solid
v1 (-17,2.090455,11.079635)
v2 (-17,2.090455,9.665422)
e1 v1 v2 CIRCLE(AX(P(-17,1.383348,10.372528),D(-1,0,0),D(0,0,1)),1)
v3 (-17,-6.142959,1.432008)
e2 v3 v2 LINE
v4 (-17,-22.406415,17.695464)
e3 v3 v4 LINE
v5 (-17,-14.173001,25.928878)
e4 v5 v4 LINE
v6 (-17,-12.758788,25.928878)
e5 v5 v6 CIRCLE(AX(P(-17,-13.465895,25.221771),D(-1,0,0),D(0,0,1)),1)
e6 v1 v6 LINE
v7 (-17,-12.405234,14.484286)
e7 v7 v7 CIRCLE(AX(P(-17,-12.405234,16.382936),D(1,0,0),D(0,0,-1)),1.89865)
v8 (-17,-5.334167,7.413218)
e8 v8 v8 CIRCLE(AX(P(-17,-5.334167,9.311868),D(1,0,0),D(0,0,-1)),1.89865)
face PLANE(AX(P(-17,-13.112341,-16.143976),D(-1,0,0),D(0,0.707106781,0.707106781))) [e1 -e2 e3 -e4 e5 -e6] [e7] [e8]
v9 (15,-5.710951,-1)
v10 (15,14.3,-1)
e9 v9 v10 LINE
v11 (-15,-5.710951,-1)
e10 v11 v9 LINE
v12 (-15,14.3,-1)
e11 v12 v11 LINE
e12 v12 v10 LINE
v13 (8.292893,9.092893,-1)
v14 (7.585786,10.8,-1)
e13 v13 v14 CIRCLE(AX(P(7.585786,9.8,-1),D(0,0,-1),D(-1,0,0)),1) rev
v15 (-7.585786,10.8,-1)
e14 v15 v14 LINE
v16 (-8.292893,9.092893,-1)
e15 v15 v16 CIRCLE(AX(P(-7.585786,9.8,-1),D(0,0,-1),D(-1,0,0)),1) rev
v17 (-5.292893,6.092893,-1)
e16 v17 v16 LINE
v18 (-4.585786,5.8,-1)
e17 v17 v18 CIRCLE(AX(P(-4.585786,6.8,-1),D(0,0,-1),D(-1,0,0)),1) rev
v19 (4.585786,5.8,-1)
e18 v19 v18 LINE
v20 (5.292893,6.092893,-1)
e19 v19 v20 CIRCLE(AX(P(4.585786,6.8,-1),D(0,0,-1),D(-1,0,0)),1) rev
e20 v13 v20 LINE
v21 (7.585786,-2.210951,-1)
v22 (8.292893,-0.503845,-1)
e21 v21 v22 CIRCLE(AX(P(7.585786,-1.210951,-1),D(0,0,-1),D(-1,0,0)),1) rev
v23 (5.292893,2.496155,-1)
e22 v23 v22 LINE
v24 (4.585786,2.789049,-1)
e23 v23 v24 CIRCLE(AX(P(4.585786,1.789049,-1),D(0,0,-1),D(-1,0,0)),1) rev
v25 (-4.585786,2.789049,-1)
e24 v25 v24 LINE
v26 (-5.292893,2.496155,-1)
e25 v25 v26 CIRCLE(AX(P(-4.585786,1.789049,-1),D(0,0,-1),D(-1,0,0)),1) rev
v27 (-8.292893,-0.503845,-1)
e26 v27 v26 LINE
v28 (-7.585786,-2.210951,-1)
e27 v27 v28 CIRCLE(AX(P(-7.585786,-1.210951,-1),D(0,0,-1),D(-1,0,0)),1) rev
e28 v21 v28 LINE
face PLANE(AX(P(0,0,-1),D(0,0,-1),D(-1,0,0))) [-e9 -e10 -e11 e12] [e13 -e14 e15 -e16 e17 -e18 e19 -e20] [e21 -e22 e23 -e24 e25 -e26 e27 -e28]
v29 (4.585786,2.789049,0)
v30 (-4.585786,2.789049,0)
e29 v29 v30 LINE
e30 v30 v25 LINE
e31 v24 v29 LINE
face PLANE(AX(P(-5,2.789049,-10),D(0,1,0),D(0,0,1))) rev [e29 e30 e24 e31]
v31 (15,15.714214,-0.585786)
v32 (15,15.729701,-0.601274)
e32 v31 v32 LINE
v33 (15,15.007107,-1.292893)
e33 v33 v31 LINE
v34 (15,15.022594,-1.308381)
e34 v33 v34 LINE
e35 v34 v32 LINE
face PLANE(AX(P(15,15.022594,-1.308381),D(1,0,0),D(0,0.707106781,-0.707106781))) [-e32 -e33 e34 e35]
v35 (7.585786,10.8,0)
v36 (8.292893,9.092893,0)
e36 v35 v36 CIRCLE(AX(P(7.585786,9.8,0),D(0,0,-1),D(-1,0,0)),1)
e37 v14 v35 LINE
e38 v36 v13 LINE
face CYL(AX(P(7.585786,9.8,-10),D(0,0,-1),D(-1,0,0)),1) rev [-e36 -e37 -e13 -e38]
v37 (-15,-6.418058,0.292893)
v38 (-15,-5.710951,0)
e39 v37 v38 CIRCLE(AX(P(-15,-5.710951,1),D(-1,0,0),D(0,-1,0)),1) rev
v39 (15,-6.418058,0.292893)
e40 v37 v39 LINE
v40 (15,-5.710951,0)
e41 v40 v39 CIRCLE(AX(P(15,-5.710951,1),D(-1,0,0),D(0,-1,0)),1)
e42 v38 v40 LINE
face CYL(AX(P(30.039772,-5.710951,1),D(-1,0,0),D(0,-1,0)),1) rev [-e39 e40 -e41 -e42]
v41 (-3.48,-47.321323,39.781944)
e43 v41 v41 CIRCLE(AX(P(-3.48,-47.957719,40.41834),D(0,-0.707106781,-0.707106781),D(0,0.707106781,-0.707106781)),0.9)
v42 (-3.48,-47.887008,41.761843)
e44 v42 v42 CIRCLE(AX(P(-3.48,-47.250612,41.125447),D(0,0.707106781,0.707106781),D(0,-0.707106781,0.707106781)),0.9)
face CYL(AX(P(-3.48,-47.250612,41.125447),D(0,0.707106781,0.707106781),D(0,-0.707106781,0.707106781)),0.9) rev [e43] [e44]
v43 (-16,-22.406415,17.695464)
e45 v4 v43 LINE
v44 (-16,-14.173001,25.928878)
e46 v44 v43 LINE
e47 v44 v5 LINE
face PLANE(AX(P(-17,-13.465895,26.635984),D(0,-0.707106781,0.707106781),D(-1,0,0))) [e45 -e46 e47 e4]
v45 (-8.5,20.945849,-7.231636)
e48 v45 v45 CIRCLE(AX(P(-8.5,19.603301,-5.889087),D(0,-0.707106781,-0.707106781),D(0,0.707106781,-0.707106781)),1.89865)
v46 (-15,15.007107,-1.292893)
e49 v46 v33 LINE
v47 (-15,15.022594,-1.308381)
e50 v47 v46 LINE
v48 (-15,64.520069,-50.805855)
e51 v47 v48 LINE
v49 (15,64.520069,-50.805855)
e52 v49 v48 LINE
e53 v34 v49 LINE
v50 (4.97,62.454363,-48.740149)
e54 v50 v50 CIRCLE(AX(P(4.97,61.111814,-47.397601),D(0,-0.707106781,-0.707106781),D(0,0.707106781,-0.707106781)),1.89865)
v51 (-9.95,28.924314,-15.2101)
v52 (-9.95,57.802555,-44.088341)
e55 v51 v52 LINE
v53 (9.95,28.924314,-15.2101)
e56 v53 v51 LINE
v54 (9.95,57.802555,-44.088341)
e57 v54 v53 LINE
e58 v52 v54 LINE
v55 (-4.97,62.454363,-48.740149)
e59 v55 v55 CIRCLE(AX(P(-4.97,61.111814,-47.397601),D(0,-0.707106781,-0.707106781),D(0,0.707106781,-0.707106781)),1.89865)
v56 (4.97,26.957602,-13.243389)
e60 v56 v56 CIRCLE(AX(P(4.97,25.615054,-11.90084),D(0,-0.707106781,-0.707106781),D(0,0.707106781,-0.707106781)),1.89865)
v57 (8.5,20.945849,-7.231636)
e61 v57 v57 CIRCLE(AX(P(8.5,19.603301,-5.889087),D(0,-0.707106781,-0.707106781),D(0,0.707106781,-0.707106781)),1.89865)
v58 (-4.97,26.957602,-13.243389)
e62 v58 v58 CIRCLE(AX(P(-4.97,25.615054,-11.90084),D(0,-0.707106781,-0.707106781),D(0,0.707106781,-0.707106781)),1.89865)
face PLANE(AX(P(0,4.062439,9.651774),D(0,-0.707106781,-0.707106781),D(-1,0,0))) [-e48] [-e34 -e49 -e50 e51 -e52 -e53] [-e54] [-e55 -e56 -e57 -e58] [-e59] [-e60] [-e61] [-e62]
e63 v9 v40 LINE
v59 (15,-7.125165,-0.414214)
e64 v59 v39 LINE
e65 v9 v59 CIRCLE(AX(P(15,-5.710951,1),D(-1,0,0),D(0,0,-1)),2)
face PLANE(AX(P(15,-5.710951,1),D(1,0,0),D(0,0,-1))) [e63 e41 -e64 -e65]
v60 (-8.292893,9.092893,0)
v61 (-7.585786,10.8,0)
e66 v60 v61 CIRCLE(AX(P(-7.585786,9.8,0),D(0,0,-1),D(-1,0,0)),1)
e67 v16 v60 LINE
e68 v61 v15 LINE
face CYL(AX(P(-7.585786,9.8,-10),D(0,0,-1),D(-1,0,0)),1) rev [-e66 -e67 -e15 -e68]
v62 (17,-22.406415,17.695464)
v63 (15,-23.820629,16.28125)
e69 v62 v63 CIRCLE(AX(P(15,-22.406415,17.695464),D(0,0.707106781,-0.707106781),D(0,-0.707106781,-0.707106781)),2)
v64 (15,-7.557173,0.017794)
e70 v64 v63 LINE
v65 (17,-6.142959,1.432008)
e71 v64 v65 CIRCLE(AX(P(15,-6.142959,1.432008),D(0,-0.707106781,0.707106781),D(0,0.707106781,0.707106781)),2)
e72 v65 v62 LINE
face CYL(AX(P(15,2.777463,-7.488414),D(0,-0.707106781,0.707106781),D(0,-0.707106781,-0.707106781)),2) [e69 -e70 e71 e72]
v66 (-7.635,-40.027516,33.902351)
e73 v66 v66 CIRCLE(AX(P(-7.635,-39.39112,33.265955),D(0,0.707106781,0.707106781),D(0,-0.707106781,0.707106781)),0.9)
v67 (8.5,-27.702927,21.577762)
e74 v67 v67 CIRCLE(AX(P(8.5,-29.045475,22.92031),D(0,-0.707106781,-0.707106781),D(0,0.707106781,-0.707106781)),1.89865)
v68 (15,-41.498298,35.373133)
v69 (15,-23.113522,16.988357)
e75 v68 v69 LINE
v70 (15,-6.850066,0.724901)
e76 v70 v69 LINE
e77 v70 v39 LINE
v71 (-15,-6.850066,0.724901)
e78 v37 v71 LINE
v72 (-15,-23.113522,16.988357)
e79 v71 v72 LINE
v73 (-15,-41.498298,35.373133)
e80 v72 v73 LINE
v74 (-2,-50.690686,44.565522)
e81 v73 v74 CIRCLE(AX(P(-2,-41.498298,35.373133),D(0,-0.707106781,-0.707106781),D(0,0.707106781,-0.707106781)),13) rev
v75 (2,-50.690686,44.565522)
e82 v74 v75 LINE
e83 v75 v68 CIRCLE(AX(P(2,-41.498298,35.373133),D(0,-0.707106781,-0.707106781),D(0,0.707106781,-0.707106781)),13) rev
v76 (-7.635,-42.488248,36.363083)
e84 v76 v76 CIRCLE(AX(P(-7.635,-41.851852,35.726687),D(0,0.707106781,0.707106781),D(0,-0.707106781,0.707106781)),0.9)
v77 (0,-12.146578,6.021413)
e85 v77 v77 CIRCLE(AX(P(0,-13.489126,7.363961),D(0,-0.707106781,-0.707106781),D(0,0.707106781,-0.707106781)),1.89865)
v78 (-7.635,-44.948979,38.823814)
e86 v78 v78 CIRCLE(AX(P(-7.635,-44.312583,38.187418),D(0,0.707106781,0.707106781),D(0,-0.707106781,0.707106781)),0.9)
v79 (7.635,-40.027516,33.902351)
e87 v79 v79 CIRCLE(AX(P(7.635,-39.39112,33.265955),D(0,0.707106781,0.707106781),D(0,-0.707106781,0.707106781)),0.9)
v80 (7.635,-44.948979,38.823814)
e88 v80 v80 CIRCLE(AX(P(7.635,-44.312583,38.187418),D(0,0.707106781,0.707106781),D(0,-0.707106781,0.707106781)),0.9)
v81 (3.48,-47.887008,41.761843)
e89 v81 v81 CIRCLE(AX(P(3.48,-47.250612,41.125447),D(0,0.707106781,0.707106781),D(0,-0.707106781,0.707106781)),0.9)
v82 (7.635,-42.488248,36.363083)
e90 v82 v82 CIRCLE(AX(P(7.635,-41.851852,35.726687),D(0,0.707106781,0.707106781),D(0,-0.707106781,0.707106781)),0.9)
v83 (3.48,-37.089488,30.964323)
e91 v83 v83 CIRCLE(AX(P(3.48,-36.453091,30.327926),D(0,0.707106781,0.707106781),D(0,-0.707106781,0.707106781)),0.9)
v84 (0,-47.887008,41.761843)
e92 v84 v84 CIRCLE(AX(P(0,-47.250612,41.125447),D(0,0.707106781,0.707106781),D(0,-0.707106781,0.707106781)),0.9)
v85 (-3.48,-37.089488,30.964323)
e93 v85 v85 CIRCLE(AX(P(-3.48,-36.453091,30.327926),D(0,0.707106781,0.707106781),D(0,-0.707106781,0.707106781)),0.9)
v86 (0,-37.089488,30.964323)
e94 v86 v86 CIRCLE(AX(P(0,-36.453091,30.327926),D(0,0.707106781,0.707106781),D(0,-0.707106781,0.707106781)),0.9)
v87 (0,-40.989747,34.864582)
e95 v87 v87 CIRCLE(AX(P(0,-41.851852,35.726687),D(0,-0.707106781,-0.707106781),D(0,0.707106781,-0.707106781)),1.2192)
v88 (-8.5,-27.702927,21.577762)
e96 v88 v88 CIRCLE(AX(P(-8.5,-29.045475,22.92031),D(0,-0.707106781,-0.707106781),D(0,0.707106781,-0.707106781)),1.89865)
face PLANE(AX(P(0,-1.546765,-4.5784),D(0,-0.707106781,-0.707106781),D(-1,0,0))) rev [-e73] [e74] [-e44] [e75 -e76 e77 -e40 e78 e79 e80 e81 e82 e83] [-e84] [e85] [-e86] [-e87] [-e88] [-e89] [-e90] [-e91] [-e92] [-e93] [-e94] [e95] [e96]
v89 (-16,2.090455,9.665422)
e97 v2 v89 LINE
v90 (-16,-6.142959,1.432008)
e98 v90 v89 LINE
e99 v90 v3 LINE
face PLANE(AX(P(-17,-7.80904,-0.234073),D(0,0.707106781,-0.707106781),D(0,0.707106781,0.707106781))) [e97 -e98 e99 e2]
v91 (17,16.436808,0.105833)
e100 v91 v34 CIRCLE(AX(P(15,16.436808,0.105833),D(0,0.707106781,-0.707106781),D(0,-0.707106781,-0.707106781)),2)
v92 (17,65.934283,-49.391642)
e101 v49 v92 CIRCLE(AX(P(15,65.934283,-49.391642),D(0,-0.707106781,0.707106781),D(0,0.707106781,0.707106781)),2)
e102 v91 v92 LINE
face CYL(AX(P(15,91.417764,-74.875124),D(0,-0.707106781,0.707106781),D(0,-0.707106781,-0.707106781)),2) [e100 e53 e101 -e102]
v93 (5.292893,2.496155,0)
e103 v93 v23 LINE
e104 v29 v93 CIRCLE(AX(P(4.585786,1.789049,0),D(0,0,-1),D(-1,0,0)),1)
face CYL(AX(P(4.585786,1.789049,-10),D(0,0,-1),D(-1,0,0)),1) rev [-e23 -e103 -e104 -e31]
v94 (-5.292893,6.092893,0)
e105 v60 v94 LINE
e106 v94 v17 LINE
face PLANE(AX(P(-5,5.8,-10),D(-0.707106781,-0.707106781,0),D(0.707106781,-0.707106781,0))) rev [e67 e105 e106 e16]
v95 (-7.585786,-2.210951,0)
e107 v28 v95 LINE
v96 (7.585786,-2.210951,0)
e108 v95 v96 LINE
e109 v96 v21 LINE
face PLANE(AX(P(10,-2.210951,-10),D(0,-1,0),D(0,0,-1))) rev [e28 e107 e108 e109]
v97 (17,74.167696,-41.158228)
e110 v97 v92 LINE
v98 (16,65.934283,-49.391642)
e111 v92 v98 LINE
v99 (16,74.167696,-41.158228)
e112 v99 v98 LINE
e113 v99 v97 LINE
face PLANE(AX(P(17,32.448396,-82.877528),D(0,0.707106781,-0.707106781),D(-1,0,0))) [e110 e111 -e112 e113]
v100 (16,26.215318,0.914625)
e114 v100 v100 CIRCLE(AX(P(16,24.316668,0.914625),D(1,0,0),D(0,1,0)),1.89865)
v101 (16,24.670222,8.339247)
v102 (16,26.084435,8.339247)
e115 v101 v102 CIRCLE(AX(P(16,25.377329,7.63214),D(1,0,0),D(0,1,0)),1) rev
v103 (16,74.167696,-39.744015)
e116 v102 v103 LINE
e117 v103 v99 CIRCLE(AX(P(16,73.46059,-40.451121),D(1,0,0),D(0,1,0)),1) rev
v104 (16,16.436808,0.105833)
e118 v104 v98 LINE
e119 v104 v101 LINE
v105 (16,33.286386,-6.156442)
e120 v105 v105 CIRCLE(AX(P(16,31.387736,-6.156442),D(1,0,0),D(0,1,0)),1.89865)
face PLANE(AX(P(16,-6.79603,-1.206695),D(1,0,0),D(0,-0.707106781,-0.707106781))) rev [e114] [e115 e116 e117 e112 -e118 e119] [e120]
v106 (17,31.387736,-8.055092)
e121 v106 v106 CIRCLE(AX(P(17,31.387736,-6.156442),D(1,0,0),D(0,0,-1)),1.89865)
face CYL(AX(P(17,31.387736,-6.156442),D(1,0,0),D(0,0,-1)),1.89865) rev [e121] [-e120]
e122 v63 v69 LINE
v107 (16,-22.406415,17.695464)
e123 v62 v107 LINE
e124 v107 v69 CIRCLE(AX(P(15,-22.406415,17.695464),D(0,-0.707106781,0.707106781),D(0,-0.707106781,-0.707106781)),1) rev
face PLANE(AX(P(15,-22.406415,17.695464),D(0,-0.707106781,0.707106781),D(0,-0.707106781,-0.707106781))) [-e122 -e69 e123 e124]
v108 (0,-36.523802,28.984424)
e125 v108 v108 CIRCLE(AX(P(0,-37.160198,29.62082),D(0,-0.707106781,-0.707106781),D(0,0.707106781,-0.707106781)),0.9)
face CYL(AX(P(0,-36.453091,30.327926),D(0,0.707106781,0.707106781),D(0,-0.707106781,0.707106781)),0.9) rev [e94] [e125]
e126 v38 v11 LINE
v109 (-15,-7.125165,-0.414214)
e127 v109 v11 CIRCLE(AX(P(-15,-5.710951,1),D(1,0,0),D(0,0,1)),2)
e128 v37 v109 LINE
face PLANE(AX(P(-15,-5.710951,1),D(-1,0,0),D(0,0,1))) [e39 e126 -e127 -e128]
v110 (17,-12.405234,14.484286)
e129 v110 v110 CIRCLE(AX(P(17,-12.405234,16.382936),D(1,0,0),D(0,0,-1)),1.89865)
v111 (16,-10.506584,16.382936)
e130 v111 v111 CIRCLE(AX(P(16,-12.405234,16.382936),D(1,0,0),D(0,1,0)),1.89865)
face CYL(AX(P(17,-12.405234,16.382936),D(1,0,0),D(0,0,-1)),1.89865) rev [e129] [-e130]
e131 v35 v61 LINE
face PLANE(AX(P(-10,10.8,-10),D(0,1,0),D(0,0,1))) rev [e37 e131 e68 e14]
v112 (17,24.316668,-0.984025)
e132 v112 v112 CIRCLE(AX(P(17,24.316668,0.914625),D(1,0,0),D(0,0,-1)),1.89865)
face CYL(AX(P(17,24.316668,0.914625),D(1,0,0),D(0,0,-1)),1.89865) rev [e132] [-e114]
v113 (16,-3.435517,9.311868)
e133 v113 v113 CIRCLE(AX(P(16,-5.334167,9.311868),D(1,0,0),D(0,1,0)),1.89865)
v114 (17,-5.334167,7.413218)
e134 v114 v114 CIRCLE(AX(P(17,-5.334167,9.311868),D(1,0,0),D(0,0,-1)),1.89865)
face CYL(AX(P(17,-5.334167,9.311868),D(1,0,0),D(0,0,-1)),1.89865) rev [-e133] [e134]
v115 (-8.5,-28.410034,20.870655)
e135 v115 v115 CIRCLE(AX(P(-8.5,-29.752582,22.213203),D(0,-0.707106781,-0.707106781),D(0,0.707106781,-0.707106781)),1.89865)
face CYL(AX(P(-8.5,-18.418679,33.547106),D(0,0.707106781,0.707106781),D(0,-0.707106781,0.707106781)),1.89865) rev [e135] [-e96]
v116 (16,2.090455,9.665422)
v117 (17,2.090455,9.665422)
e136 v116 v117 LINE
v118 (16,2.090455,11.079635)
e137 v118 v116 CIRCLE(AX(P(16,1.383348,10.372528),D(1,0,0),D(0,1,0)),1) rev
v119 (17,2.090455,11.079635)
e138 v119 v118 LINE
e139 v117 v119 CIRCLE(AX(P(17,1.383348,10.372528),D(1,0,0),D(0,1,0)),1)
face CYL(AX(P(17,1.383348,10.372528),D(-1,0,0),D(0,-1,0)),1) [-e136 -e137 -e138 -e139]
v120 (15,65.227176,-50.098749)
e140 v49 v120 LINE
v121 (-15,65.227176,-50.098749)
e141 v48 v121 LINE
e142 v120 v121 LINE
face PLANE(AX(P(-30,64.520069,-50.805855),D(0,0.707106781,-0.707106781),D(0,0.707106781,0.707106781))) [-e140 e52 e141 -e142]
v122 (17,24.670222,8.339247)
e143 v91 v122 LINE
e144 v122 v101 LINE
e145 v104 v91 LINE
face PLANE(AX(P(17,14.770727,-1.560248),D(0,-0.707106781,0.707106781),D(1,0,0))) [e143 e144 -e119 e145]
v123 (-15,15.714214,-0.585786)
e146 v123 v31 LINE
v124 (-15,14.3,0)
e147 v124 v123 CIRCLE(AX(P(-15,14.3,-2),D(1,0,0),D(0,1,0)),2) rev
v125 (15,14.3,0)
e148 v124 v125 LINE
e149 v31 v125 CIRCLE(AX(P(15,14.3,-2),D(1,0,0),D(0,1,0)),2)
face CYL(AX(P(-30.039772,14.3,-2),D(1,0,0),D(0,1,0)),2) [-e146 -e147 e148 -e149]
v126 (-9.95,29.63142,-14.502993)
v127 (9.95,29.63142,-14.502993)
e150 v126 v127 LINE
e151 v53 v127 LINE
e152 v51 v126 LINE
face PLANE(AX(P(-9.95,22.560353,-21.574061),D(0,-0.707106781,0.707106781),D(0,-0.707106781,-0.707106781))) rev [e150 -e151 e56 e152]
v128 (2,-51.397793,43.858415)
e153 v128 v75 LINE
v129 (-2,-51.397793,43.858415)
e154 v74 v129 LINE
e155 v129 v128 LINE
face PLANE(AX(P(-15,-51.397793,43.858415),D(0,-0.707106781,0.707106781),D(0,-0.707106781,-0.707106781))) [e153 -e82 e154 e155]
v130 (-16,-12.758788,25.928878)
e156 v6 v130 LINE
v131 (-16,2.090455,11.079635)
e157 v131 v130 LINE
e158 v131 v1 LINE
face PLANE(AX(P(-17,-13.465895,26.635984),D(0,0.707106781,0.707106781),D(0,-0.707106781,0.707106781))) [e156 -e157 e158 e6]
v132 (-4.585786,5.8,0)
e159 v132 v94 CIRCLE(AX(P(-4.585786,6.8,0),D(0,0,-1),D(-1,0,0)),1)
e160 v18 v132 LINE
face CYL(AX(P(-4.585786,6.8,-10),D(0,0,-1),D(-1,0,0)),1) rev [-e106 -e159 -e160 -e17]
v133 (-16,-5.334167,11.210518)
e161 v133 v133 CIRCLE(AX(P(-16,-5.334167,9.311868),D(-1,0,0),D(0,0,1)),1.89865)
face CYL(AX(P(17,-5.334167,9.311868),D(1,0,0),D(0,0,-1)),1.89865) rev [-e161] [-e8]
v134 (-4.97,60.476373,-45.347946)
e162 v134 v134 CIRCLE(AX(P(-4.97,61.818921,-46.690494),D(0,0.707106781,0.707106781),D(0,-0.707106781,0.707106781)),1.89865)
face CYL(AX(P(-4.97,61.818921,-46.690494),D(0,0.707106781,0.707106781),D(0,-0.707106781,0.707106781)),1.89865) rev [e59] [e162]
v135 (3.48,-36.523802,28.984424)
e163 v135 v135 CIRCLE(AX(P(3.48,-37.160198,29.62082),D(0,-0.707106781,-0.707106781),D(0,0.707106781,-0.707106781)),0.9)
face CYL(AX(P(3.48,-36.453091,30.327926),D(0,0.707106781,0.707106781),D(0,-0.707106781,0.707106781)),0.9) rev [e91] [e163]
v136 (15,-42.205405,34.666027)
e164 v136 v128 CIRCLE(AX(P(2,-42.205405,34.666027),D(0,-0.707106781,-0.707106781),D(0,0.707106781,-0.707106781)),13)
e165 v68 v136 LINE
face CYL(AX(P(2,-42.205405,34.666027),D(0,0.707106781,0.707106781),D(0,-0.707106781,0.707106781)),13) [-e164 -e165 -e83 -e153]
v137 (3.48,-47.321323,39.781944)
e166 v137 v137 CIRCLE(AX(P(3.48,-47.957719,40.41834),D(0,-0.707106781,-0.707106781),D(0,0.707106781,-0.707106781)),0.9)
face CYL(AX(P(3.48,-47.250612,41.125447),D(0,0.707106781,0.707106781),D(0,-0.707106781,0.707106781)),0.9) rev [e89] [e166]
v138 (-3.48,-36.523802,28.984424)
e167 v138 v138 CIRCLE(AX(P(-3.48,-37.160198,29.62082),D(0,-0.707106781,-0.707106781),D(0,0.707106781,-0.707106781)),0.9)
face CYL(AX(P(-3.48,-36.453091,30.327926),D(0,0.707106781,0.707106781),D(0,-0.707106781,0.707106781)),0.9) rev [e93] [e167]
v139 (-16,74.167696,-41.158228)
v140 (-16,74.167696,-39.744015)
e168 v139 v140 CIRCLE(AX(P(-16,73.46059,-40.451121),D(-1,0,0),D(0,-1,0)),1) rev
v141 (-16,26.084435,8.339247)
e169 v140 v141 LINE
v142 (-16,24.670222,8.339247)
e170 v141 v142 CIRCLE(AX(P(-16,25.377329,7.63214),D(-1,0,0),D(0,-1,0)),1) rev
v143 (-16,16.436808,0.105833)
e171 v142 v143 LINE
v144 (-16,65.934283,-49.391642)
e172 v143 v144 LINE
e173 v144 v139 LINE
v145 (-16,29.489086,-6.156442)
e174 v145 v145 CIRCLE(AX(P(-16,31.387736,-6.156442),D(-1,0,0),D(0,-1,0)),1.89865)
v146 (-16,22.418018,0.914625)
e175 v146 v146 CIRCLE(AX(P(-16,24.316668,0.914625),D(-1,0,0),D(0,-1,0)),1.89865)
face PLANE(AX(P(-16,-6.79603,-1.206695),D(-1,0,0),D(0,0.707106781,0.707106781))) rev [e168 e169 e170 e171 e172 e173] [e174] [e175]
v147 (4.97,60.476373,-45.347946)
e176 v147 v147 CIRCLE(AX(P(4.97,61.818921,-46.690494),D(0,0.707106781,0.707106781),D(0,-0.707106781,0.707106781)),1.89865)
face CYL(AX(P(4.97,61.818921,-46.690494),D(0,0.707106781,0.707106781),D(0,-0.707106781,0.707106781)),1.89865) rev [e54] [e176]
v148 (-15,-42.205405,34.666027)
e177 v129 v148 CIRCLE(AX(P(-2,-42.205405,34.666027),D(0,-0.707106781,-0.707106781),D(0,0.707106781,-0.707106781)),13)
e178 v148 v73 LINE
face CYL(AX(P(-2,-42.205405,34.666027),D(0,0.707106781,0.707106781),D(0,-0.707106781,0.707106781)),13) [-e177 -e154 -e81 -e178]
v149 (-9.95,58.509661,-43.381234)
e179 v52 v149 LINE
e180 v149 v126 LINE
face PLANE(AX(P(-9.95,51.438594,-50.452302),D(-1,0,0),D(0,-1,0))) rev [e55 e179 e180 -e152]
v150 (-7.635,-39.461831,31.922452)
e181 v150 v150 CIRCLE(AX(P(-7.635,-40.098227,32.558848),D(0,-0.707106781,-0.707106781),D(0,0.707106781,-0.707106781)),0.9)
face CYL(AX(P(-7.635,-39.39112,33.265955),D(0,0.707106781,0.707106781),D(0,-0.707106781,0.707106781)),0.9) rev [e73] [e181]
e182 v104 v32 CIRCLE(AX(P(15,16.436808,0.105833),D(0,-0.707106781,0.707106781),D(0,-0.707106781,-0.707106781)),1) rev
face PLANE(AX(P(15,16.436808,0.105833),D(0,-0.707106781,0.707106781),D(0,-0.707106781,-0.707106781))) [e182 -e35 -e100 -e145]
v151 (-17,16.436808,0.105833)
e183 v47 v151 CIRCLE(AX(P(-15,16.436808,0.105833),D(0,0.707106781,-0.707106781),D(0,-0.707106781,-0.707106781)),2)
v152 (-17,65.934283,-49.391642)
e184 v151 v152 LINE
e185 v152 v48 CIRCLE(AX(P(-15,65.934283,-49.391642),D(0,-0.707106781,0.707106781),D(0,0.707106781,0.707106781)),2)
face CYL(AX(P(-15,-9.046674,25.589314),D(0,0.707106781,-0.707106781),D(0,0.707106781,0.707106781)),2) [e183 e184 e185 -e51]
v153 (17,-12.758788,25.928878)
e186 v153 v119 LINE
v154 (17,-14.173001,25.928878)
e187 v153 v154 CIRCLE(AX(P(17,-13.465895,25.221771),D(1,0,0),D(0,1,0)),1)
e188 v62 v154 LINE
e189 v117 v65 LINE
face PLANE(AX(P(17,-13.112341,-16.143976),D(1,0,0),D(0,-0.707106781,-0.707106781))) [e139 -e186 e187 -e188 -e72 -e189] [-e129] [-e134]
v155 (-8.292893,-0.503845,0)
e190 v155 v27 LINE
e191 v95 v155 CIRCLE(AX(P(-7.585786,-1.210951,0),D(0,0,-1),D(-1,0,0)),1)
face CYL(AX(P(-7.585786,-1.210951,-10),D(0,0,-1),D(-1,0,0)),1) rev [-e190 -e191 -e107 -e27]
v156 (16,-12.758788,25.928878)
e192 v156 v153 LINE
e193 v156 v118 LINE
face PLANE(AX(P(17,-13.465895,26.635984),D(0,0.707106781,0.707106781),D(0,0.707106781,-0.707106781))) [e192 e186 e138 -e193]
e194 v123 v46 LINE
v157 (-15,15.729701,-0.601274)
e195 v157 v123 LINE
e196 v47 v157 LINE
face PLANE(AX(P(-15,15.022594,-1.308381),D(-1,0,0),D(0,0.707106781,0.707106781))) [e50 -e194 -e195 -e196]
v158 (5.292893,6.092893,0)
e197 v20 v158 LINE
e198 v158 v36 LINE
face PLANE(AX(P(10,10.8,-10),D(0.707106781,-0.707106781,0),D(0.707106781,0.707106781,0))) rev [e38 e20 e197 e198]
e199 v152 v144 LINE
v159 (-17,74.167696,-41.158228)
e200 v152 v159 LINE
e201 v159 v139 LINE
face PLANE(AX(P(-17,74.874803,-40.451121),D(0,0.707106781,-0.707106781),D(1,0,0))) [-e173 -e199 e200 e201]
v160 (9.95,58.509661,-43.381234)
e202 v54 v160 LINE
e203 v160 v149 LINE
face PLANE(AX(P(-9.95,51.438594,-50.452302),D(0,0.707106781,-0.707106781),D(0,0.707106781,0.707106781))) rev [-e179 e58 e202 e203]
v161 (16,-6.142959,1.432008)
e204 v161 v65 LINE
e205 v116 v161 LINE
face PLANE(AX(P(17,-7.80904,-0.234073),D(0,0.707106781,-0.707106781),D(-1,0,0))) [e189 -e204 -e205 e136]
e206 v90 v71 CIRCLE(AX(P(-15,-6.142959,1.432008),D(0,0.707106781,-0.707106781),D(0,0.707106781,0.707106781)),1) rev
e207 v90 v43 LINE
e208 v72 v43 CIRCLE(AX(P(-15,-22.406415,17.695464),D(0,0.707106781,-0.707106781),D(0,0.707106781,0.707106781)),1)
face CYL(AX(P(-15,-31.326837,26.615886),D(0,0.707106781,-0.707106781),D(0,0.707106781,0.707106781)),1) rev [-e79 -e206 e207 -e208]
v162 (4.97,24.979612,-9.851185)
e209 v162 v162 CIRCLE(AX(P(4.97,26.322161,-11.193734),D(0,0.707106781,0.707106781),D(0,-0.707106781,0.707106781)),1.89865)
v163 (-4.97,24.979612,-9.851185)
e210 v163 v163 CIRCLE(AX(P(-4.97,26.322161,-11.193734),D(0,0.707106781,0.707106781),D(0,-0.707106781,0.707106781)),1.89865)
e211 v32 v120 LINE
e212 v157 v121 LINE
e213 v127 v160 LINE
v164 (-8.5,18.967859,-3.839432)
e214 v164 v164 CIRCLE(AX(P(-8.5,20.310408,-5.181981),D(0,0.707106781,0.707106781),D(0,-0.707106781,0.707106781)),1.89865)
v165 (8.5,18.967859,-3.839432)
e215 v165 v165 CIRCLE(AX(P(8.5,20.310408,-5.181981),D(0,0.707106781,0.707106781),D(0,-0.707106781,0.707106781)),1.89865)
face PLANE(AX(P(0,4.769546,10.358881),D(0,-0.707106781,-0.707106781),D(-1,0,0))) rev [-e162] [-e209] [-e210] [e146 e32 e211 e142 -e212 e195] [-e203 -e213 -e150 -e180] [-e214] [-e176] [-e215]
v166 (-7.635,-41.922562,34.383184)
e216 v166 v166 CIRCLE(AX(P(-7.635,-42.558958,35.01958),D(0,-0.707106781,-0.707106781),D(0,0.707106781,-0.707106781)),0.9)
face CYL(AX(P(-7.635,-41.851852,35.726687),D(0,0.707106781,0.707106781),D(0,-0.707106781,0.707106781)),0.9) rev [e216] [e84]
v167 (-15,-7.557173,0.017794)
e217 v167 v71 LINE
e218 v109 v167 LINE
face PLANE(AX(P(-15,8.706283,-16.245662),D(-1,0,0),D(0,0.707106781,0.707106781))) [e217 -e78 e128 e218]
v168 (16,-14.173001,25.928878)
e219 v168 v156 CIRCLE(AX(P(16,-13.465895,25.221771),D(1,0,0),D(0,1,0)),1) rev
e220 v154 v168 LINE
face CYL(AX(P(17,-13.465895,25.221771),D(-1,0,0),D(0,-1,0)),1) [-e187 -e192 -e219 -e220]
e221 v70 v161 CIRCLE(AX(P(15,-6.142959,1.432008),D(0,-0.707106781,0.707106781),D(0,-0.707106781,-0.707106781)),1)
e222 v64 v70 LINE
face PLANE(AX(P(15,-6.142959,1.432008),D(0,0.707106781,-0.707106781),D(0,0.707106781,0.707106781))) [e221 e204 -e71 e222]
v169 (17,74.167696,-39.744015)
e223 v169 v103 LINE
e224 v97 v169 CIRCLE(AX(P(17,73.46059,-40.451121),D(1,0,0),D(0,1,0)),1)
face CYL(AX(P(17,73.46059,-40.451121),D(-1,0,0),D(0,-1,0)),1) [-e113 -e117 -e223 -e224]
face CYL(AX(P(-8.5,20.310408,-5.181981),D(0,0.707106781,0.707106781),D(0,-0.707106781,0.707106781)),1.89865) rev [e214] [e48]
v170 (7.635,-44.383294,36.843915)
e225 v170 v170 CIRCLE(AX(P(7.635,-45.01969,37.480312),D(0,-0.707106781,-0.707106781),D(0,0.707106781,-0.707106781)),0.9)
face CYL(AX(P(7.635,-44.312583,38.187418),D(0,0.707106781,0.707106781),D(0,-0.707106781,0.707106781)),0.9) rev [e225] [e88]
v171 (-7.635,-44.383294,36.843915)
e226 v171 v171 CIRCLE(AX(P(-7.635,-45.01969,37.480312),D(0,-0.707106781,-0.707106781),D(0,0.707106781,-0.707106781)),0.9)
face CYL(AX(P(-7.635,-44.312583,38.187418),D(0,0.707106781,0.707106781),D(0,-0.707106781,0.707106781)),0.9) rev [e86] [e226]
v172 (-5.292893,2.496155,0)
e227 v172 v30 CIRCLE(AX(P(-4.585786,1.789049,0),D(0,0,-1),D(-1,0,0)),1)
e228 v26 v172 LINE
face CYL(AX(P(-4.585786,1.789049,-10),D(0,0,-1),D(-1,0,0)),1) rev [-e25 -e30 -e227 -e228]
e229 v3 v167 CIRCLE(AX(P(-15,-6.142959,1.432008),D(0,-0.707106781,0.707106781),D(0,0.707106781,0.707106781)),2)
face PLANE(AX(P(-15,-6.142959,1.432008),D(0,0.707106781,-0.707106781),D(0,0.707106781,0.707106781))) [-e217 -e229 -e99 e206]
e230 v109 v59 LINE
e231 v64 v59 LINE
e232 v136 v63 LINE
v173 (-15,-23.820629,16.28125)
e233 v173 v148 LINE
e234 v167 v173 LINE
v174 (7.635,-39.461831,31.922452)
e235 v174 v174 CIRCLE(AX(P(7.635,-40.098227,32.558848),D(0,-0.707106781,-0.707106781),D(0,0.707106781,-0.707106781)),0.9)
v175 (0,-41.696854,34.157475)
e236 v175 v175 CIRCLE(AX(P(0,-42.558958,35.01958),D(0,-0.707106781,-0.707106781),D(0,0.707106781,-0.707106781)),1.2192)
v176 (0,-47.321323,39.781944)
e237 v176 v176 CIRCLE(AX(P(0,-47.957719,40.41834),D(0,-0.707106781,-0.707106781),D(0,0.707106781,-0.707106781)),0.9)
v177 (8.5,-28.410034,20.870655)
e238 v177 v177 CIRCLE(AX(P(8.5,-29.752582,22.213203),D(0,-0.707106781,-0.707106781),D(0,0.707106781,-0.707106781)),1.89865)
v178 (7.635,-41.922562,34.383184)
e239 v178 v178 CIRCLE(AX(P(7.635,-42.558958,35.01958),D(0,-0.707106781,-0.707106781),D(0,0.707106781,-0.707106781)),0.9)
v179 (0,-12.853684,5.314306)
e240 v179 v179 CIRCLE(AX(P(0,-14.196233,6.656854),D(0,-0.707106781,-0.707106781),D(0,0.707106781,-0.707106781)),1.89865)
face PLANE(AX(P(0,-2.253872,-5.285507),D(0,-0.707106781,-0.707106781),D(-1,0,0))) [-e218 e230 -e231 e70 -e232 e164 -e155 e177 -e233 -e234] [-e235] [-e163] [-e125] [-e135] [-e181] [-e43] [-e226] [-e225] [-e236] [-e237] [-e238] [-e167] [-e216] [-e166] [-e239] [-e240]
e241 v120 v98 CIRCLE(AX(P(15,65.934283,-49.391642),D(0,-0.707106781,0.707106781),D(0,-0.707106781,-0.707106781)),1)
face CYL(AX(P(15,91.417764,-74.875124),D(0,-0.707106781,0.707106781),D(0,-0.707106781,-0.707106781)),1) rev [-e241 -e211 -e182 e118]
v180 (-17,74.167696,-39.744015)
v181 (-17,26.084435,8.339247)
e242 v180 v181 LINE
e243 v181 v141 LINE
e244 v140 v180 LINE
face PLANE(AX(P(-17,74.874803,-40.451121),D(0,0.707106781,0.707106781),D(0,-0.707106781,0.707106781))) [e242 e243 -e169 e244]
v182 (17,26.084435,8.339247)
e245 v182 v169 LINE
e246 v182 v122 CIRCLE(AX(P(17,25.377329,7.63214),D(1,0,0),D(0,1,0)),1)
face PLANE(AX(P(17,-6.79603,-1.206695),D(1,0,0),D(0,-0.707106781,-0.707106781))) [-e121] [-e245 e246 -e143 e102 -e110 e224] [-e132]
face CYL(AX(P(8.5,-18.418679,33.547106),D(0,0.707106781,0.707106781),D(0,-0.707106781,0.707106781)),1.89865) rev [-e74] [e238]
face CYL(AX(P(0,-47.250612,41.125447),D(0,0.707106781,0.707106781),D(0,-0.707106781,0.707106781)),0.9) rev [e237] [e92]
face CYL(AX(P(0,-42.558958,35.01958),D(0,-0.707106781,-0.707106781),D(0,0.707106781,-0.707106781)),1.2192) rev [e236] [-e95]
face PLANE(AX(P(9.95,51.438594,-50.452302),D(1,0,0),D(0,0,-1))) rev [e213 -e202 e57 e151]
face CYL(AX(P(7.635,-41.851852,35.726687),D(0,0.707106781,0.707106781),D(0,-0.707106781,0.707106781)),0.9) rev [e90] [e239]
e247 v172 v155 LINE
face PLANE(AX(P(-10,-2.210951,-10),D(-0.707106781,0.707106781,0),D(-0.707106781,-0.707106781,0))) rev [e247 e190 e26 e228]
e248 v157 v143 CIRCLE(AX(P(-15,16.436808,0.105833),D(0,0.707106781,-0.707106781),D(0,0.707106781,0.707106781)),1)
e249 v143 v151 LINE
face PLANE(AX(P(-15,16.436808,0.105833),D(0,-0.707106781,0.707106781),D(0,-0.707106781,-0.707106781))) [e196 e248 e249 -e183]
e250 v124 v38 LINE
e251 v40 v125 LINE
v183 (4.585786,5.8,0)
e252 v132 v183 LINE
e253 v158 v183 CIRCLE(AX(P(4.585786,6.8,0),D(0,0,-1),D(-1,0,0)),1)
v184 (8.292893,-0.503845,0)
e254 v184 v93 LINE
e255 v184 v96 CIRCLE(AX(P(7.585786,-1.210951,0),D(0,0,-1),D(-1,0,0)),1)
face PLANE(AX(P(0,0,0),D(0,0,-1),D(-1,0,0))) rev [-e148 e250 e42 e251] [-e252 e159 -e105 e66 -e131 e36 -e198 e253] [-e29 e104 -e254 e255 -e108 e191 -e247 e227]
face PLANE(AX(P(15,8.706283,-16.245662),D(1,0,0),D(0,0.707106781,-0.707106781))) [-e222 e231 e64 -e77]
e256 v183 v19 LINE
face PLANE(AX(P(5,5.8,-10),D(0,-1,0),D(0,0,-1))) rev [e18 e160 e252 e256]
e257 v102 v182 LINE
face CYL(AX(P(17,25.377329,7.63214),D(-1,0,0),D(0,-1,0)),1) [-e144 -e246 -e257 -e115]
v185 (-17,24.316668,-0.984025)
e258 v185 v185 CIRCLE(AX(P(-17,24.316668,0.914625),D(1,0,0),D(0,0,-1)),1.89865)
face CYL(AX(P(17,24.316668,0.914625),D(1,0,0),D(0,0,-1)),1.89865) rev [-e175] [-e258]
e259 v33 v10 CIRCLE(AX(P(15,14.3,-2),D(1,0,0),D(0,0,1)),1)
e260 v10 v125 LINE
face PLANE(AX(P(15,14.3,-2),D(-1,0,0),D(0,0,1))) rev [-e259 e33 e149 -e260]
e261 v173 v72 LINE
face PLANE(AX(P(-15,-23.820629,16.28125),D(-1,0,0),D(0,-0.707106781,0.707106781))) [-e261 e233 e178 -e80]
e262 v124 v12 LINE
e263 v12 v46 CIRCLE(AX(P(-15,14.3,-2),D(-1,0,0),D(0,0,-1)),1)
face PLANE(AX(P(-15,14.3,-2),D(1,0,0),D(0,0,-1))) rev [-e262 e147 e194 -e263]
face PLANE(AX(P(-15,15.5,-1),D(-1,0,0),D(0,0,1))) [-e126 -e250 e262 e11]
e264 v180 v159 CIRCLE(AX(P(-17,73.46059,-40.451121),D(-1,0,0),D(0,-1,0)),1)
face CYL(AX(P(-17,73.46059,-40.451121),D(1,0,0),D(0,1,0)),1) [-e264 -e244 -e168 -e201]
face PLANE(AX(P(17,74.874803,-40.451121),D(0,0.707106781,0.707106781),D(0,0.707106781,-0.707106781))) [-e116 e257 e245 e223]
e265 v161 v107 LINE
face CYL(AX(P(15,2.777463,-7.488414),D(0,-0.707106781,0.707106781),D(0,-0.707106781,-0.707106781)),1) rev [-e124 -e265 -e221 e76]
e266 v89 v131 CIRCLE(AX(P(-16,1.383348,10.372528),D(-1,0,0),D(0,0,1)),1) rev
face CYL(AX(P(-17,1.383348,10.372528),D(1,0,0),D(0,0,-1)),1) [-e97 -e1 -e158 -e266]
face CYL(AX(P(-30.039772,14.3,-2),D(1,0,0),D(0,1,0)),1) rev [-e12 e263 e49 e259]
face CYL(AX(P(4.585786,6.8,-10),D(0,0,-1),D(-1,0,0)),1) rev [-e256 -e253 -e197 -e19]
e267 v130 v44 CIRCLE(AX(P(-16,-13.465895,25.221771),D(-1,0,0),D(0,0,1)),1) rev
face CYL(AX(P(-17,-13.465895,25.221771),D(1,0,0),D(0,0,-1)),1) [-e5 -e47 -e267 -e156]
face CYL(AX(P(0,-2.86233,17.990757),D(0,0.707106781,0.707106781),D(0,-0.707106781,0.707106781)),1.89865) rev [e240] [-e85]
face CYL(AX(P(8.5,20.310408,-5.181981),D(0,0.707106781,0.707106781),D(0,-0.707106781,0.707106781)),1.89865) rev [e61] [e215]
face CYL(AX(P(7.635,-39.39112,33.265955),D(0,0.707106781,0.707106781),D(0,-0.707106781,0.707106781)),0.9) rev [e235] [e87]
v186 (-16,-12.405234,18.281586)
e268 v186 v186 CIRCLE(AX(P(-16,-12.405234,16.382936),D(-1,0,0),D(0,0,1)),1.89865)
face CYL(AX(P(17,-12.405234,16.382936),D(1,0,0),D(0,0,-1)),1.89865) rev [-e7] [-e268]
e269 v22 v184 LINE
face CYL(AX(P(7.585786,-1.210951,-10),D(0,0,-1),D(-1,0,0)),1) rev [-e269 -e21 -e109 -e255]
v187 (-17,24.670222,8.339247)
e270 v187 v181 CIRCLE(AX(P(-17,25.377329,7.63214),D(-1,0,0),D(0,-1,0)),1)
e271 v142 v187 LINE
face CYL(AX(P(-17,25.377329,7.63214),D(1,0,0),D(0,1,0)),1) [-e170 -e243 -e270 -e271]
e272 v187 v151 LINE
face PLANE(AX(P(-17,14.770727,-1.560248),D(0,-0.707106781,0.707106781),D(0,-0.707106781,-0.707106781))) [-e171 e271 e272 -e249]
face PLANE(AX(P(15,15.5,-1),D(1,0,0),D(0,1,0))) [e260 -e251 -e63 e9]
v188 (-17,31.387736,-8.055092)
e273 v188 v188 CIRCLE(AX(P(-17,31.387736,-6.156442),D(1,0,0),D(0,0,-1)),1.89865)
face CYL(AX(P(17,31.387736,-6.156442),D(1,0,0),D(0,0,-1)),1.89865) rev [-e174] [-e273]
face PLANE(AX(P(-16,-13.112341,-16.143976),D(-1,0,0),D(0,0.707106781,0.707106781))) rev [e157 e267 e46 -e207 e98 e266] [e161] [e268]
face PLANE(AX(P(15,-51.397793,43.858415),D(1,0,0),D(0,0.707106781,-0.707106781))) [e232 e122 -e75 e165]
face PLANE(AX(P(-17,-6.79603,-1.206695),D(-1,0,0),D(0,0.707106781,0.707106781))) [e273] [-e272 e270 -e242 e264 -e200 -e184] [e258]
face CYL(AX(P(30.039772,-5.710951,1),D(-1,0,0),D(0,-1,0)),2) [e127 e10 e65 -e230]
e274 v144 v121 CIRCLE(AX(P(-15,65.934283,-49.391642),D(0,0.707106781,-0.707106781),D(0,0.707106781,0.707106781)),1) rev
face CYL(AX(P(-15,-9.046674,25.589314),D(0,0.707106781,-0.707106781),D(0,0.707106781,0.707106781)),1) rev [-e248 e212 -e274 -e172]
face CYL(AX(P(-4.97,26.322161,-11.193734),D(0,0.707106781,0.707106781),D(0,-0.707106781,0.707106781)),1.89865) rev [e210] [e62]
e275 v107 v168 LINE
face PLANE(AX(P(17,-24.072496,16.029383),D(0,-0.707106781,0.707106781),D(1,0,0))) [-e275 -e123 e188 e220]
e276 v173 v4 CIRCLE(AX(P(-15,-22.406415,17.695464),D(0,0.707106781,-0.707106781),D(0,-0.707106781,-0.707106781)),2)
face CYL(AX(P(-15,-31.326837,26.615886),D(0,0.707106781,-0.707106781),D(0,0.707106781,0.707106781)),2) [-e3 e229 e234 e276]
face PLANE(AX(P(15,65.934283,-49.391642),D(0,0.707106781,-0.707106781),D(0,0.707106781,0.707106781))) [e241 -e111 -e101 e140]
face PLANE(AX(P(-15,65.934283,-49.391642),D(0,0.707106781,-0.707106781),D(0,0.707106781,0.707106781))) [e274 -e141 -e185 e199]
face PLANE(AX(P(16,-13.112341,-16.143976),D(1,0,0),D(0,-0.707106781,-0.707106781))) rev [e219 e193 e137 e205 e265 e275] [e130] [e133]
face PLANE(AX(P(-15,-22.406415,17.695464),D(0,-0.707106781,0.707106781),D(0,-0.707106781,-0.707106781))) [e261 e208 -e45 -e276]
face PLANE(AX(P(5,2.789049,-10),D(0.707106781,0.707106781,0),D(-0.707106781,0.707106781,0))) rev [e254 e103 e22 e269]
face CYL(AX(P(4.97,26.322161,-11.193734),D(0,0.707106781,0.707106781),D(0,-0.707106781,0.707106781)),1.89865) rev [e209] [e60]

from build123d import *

# Parameters (mm, degrees)
BASE_FLANGE1_DEPTH     = 1
SKETCHED_START         = -30
SKETCHED_BEND5_DEPTH   = 60
SKETCHED_BEND5_2_DEPTH = 15
SKETCHED_START_2       = 15
SKETCHED_BEND5_3_DEPTH = 15
SKETCHED_BEND5_4_DEPTH = 60
SKETCHED_START_3       = -15
SKETCHED_BEND5_5_DEPTH = 30
SKETCHED_BEND6_DEPTH   = 60
SKETCHED_BEND6_2_DEPTH = 15
SKETCHED_BEND6_3_DEPTH = 15
SKETCHED_BEND6_4_DEPTH = 30
SKETCHED_BEND6_5_DEPTH = 60
SKETCHED_START_4       = -28.356310605
SKETCHED_BEND7_DEPTH   = 23
SKETCHED_BEND7_2_DEPTH = 23
SKETCHED_START_5       = 11.547743288
SKETCHED_BEND8_DEPTH   = 70
SKETCHED_BEND8_2_DEPTH = 70
SKETCH36_W             = 19.9
SKETCH36_H             = 40.84
CUT_EXTRUDE1_DEPTH     = 10
F_6_CLEARANCE_HOLE4_D  = 3.7973
F_6_CLEARANCE_HOLE2_D  = 3.7973
M1_6_CLEARANCE_HOLE1_D = 1.8
FILLET2_R              = 13
F_2_CLEARANCE_HOLE1_D  = 2.4384
CUT_EXTRUDE2_DEPTH     = 10
FILLET1_R              = 1


# Read off the part's stored shape, not the designer's step: Sketched Bend5, Sketched Bend6, Sketched Bend7, Sketched Bend8
# Sheet-metal steps are written as plain solids
with BuildPart() as part:
    # Sketch1 → Base-Flange1 (new body)
    with BuildSketch(Plane.XY):
        Polygon((-30, -30.5), (-15, -30.5), (-15, -69.5), (15, -69.5), (15, -30.5), (30, -30.5), (30, -7.5), (15, -7.5), (15, 15.5), (30, 15.5), (30, 85.5), (-30, 85.5), (-30, 15.5), (-15, 15.5), (-15, -7.5), (-30, -7.5), align=None)
    extrude(amount=-BASE_FLANGE1_DEPTH)

    # Sketched Bend5 outline → Sketched Bend5 (cut)
    with BuildSketch(Plane.YZ.offset(SKETCHED_START)):
        with BuildLine():
            Line((15.714213562, -0.585786438), (16.128427124, -1))
            Line((16.128427124, -1), (85.5, -1))
            Line((85.5, -1), (85.5, 0))
            Line((85.5, 0), (14.3, 0))
            ThreePointArc((14.3, 0), (15.065366865, -0.152240935), (15.714213562, -0.585786438))
        make_face()
    extrude(amount=SKETCHED_BEND5_DEPTH, mode=Mode.SUBTRACT)

    # Sketched Bend5 2 outline → Sketched Bend5 2 (cut)
    with BuildSketch(Plane.YZ.offset(SKETCHED_START)):
        with BuildLine():
            Line((15.729701149, -0.601274024), (15.714213562, -0.585786438))
            ThreePointArc((15.714213562, -0.585786438), (15.610403483, -0.48909209), (15.5, -0.4))
            Line((15.5, -0.4), (15.5, -0.830975173))
            Line((15.5, -0.830975173), (15.729701149, -0.601274024))
        make_face()
    extrude(amount=SKETCHED_BEND5_2_DEPTH, mode=Mode.SUBTRACT)

    # Sketched Bend5 3 outline → Sketched Bend5 3 (cut)
    with BuildSketch(Plane.YZ.offset(SKETCHED_START_2)):
        with BuildLine():
            Line((15.729701149, -0.601274024), (15.714213562, -0.585786438))
            ThreePointArc((15.714213562, -0.585786438), (15.610403483, -0.48909209), (15.5, -0.4))
            Line((15.5, -0.4), (15.5, -0.830975173))
            Line((15.5, -0.830975173), (15.729701149, -0.601274024))
        make_face()
    extrude(amount=SKETCHED_BEND5_3_DEPTH, mode=Mode.SUBTRACT)

    # Sketched Bend5 4 outline → Sketched Bend5 4 (add)
    with BuildSketch(Plane.YZ.offset(SKETCHED_START)):
        Polygon((65.227175832, -50.098748707), (16.128427124, -1), (15.5, -1), (15.5, -0.830975173), (15.022594368, -1.308380805), (64.520069051, -50.805855488), align=None)
    extrude(amount=SKETCHED_BEND5_4_DEPTH)

    # Sketched Bend5 5 outline → Sketched Bend5 5 (add)
    with BuildSketch(Plane.YZ.offset(SKETCHED_START_3)):
        with BuildLine():
            Line((15.022594368, -1.308380805), (15.330975173, -1))
            Line((15.330975173, -1), (14.3, -1))
            ThreePointArc((14.3, -1), (14.682683432, -1.076120467), (15.007106781, -1.292893219))
            Line((15.007106781, -1.292893219), (15.022594368, -1.308380805))
        make_face()
    extrude(amount=SKETCHED_BEND5_5_DEPTH)

    # Sketched Bend6 outline → Sketched Bend6 (cut)
    with BuildSketch(Plane.YZ.offset(SKETCHED_START)):
        with BuildLine():
            ThreePointArc((-5.710951377, -1), (-6.476318242, -0.847759065), (-7.12516494, -0.414213562))
            Line((-7.12516494, -0.414213562), (-7.539378502, 0))
            Line((-7.539378502, 0), (-69.5, 0))
            Line((-69.5, 0), (-69.5, -1))
            Line((-69.5, -1), (-5.710951377, -1))
        make_face()
    extrude(amount=SKETCHED_BEND6_DEPTH, mode=Mode.SUBTRACT)

    # Sketched Bend6 2 outline → Sketched Bend6 2 (cut)
    with BuildSketch(Plane.YZ.offset(SKETCHED_START)):
        Polygon((-7.539378502, 0), (-7.5, -0.039378502), (-7.5, 0), align=None)
    extrude(amount=SKETCHED_BEND6_2_DEPTH, mode=Mode.SUBTRACT)

    # Sketched Bend6 3 outline → Sketched Bend6 3 (cut)
    with BuildSketch(Plane.YZ.offset(SKETCHED_START_2)):
        Polygon((-7.539378502, 0), (-7.5, -0.039378502), (-7.5, 0), align=None)
    extrude(amount=SKETCHED_BEND6_3_DEPTH, mode=Mode.SUBTRACT)

    # Sketched Bend6 4 outline → Sketched Bend6 4 (add)
    with BuildSketch(Plane.YZ.offset(SKETCHED_START_3)):
        with BuildLine():
            Line((-7.539378502, 0), (-5.710951377, 0))
            ThreePointArc((-5.710951377, 0), (-6.09363481, 0.076120467), (-6.418058159, 0.292893219))
            Line((-6.418058159, 0.292893219), (-50.690686454, 44.565521514))
            Line((-50.690686454, 44.565521514), (-51.397793235, 43.858414733))
            Line((-51.397793235, 43.858414733), (-7.539378502, 0))
        make_face()
    extrude(amount=SKETCHED_BEND6_4_DEPTH)

    # Sketched Bend6 5 outline → Sketched Bend6 5 (add)
    with BuildSketch(Plane.YZ.offset(SKETCHED_START)):
        Polygon((-23.820628769, 16.281250267), (-7.557172802, 0.0177943), (-6.850066021, 0.724901081), (-23.113521988, 16.988357048), align=None)
    extrude(amount=SKETCHED_BEND6_5_DEPTH)

    # Sketched Bend7 outline → Sketched Bend7 (cut)
    with BuildSketch(Plane(origin=(0, 0, 0), x_dir=(1, 0, 0), z_dir=(0, 0.707106781186546, -0.707106781186549)).offset(SKETCHED_START_4)):
        with BuildLine():
            ThreePointArc((-16.732050807, 4.331145665), (-16, 5.063196472), (-15, 5.331145665))
            Line((-15, 5.331145665), (-30, 5.331145665))
            Line((-30, 5.331145665), (-30, 4.331145665))
            Line((-30, 4.331145665), (-16.732050807, 4.331145665))
        make_face()
        with BuildLine():
            Line((30, 5.331145665), (15, 5.331145665))
            ThreePointArc((15, 5.331145665), (16, 5.063196472), (16.732050807, 4.331145665))
            Line((16.732050807, 4.331145665), (30, 4.331145665))
            Line((30, 4.331145665), (30, 5.331145665))
        make_face()
    extrude(amount=SKETCHED_BEND7_DEPTH, mode=Mode.SUBTRACT)

    # Sketched Bend7 2 outline → Sketched Bend7 2 (add)
    with BuildSketch(Plane(origin=(0, 0, 0), x_dir=(1, 0, 0), z_dir=(0, 0.707106781186546, -0.707106781186549)).offset(SKETCHED_START_4)):
        with BuildLine():
            Line((-15, 4.331145665), (-16.732050807, 4.331145665))
            ThreePointArc((-16.732050807, 4.331145665), (-16.931851652, 3.848783755), (-17, 3.331145665))
            Line((-17, 3.331145665), (-17, -9.312659845))
            Line((-17, -9.312659845), (-16, -9.312659845))
            Line((-16, -9.312659845), (-16, 3.331145665))
            ThreePointArc((-16, 3.331145665), (-15.707106781, 4.038252446), (-15, 4.331145665))
        make_face()
        with BuildLine():
            ThreePointArc((17, 3.331145665), (16.931851652, 3.848783755), (16.732050807, 4.331145665))
            Line((16.732050807, 4.331145665), (15, 4.331145665))
            ThreePointArc((15, 4.331145665), (15.707106781, 4.038252446), (16, 3.331145665))
            Line((16, 3.331145665), (16, -9.312659845))
            Line((16, -9.312659845), (17, -9.312659845))
            Line((17, -9.312659845), (17, 3.331145665))
        make_face()
    extrude(amount=SKETCHED_BEND7_2_DEPTH)

    # Sketched Bend8 outline → Sketched Bend8 (cut)
    with BuildSketch(Plane(origin=(0, 0, 0), x_dir=(1, 0, 0), z_dir=(0, 0.707106781186546, -0.707106781186549)).offset(SKETCHED_START_5)):
        with BuildLine():
            Line((-30, -10.697413409), (-16.732050808, -10.697413409))
            ThreePointArc((-16.732050808, -10.697413409), (-16, -9.965362601), (-15, -9.697413409))
            Line((-15, -9.697413409), (-30, -9.697413409))
            Line((-30, -9.697413409), (-30, -10.697413409))
        make_face()
        with BuildLine():
            Line((30, -9.697413409), (15, -9.697413409))
            ThreePointArc((15, -9.697413409), (16, -9.965362601), (16.732050808, -10.697413409))
            Line((16.732050808, -10.697413409), (30, -10.697413409))
            Line((30, -10.697413409), (30, -9.697413409))
        make_face()
    extrude(amount=SKETCHED_BEND8_DEPTH, mode=Mode.SUBTRACT)

    # Sketched Bend8 2 outline → Sketched Bend8 2 (add)
    with BuildSketch(Plane(origin=(0, 0, 0), x_dir=(1, 0, 0), z_dir=(0, 0.707106781186546, -0.707106781186549)).offset(SKETCHED_START_5)):
        with BuildLine():
            ThreePointArc((-16.732050808, -10.697413409), (-16.931851653, -11.179775319), (-17, -11.697413409))
            Line((-17, -11.697413409), (-17, -24.341218918))
            Line((-17, -24.341218918), (-16, -24.341218918))
            Line((-16, -24.341218918), (-16, -11.697413409))
            ThreePointArc((-16, -11.697413409), (-15.707106781, -10.990306628), (-15, -10.697413409))
            Line((-15, -10.697413409), (-16.732050808, -10.697413409))
        make_face()
        with BuildLine():
            Line((16.732050808, -10.697413409), (15, -10.697413409))
            ThreePointArc((15, -10.697413409), (15.707106781, -10.990306628), (16, -11.697413409))
            Line((16, -11.697413409), (16, -24.341218918))
            Line((16, -24.341218918), (17, -24.341218918))
            Line((17, -24.341218918), (17, -11.697413409))
            ThreePointArc((17, -11.697413409), (16.931851653, -11.179775319), (16.732050808, -10.697413409))
        make_face()
    extrude(amount=SKETCHED_BEND8_2_DEPTH)

    # Sketch36 → Cut-Extrude1 (cut)
    with BuildSketch(Plane(origin=(0, 7.564213562, 7.564213562), x_dir=(1, 0, 0), z_dir=(0, 0.7071067811865487, 0.7071067811865465))):
        with Locations((0, 51.627743288)):
            Rectangle(SKETCH36_W, SKETCH36_H)
    extrude(amount=-CUT_EXTRUDE1_DEPTH, mode=Mode.SUBTRACT)

    # #6 Clearance Hole4 (through all)
    with Locations(Plane(origin=(0, 7.564213562, 7.564213562), x_dir=(1, 0, 0), z_dir=(0, 0.7071067811865487, 0.7071067811865465))):
        with Locations((-4.97, 76.727743288), (4.97, 76.727743288), (-4.97, 26.527743288), (4.97, 26.527743288), (-8.5, 18.025840533), (8.5, 18.025840533), (0, -14.745359227), (-8.5, -36.745359227), (8.5, -36.745359227)):
            Hole(F_6_CLEARANCE_HOLE4_D / 2)

    # #6 Clearance Hole2 (through all)
    with Locations(Plane(origin=(17, 0, 0), x_dir=(0, 0, -1), z_dir=(1, 0, 0))):
        with Locations((-9.311868306, -5.334166607), (-16.382936118, -12.405234419), (-0.914625389, 24.316668374), (6.156442422, 31.387736186)):
            Hole(F_6_CLEARANCE_HOLE2_D / 2)

    # M1.6 Clearance Hole1 (through all)
    with Locations(Plane(origin=(0, -3.06258247, -3.06258247), x_dir=(1, 0, 0), z_dir=(0, 0.7071067811865487, 0.7071067811865465))):
        with Locations((0, -47.221310605), (-3.48, -47.221310605), (3.48, -47.221310605), (-3.48, -62.491310605), (0, -62.491310605), (3.48, -62.491310605), (7.635, -58.336310605), (7.635, -54.856310605), (7.635, -51.376310605), (-7.635, -58.336310605), (-7.635, -54.856310605), (-7.635, -51.376310605)):
            Hole(M1_6_CLEARANCE_HOLE1_D / 2)

    # Fillet2
    fillet2_edges = [part.edges().sort_by_distance(p)[0] for p in [
        (-15, -51.044239844, 44.211968124),
        (15, -51.044239844, 44.211968124),
    ]]
    fillet(fillet2_edges, radius=FILLET2_R)

    # #2 Clearance Hole1 (through all)
    with Locations(Plane(origin=(0, -3.769689251, -3.769689251), x_dir=(-1, 0, 0), z_dir=(0, -0.7071067811865487, -0.7071067811865465))):
        with Locations((0, -54.856310605)):
            Hole(F_2_CLEARANCE_HOLE1_D / 2)

    # Sketch51 → Cut-Extrude2 (cut)
    with BuildSketch(Plane.XY):
        Polygon((-10, 10.8), (10, 10.8), (5, 5.8), (-5, 5.8), align=None)
        Polygon((-5, 2.789048623), (5, 2.789048623), (10, -2.210951377), (-10, -2.210951377), align=None)
    extrude(amount=-CUT_EXTRUDE2_DEPTH, mode=Mode.SUBTRACT)

    # Fillet1
    fillet1_edges = [part.edges().sort_by_distance(p)[0] for p in [
        (-16.5, -13.465894591, 26.635984446),
        (-16.5, 2.797561376, 10.372528478),
        (16.5, 2.797561376, 10.372528478),
        (16.5, -13.465894591, 26.635984446),
        (-16.5, 25.377328546, 9.046353373),
        (-16.5, 74.874803229, -40.45112131),
        (16.5, 74.874803229, -40.45112131),
        (16.5, 25.377328546, 9.046353373),
        (-5, 5.8, -0.5),
        (-10, 10.8, -0.5),
        (10, 10.8, -0.5),
        (5, 5.8, -0.5),
        (-10, -2.210951377, -0.5),
        (-5, 2.789048623, -0.5),
        (5, 2.789048623, -0.5),
        (10, -2.210951377, -0.5),
    ]]
    fillet(fillet1_edges, radius=FILLET1_R)


solid = part.part
